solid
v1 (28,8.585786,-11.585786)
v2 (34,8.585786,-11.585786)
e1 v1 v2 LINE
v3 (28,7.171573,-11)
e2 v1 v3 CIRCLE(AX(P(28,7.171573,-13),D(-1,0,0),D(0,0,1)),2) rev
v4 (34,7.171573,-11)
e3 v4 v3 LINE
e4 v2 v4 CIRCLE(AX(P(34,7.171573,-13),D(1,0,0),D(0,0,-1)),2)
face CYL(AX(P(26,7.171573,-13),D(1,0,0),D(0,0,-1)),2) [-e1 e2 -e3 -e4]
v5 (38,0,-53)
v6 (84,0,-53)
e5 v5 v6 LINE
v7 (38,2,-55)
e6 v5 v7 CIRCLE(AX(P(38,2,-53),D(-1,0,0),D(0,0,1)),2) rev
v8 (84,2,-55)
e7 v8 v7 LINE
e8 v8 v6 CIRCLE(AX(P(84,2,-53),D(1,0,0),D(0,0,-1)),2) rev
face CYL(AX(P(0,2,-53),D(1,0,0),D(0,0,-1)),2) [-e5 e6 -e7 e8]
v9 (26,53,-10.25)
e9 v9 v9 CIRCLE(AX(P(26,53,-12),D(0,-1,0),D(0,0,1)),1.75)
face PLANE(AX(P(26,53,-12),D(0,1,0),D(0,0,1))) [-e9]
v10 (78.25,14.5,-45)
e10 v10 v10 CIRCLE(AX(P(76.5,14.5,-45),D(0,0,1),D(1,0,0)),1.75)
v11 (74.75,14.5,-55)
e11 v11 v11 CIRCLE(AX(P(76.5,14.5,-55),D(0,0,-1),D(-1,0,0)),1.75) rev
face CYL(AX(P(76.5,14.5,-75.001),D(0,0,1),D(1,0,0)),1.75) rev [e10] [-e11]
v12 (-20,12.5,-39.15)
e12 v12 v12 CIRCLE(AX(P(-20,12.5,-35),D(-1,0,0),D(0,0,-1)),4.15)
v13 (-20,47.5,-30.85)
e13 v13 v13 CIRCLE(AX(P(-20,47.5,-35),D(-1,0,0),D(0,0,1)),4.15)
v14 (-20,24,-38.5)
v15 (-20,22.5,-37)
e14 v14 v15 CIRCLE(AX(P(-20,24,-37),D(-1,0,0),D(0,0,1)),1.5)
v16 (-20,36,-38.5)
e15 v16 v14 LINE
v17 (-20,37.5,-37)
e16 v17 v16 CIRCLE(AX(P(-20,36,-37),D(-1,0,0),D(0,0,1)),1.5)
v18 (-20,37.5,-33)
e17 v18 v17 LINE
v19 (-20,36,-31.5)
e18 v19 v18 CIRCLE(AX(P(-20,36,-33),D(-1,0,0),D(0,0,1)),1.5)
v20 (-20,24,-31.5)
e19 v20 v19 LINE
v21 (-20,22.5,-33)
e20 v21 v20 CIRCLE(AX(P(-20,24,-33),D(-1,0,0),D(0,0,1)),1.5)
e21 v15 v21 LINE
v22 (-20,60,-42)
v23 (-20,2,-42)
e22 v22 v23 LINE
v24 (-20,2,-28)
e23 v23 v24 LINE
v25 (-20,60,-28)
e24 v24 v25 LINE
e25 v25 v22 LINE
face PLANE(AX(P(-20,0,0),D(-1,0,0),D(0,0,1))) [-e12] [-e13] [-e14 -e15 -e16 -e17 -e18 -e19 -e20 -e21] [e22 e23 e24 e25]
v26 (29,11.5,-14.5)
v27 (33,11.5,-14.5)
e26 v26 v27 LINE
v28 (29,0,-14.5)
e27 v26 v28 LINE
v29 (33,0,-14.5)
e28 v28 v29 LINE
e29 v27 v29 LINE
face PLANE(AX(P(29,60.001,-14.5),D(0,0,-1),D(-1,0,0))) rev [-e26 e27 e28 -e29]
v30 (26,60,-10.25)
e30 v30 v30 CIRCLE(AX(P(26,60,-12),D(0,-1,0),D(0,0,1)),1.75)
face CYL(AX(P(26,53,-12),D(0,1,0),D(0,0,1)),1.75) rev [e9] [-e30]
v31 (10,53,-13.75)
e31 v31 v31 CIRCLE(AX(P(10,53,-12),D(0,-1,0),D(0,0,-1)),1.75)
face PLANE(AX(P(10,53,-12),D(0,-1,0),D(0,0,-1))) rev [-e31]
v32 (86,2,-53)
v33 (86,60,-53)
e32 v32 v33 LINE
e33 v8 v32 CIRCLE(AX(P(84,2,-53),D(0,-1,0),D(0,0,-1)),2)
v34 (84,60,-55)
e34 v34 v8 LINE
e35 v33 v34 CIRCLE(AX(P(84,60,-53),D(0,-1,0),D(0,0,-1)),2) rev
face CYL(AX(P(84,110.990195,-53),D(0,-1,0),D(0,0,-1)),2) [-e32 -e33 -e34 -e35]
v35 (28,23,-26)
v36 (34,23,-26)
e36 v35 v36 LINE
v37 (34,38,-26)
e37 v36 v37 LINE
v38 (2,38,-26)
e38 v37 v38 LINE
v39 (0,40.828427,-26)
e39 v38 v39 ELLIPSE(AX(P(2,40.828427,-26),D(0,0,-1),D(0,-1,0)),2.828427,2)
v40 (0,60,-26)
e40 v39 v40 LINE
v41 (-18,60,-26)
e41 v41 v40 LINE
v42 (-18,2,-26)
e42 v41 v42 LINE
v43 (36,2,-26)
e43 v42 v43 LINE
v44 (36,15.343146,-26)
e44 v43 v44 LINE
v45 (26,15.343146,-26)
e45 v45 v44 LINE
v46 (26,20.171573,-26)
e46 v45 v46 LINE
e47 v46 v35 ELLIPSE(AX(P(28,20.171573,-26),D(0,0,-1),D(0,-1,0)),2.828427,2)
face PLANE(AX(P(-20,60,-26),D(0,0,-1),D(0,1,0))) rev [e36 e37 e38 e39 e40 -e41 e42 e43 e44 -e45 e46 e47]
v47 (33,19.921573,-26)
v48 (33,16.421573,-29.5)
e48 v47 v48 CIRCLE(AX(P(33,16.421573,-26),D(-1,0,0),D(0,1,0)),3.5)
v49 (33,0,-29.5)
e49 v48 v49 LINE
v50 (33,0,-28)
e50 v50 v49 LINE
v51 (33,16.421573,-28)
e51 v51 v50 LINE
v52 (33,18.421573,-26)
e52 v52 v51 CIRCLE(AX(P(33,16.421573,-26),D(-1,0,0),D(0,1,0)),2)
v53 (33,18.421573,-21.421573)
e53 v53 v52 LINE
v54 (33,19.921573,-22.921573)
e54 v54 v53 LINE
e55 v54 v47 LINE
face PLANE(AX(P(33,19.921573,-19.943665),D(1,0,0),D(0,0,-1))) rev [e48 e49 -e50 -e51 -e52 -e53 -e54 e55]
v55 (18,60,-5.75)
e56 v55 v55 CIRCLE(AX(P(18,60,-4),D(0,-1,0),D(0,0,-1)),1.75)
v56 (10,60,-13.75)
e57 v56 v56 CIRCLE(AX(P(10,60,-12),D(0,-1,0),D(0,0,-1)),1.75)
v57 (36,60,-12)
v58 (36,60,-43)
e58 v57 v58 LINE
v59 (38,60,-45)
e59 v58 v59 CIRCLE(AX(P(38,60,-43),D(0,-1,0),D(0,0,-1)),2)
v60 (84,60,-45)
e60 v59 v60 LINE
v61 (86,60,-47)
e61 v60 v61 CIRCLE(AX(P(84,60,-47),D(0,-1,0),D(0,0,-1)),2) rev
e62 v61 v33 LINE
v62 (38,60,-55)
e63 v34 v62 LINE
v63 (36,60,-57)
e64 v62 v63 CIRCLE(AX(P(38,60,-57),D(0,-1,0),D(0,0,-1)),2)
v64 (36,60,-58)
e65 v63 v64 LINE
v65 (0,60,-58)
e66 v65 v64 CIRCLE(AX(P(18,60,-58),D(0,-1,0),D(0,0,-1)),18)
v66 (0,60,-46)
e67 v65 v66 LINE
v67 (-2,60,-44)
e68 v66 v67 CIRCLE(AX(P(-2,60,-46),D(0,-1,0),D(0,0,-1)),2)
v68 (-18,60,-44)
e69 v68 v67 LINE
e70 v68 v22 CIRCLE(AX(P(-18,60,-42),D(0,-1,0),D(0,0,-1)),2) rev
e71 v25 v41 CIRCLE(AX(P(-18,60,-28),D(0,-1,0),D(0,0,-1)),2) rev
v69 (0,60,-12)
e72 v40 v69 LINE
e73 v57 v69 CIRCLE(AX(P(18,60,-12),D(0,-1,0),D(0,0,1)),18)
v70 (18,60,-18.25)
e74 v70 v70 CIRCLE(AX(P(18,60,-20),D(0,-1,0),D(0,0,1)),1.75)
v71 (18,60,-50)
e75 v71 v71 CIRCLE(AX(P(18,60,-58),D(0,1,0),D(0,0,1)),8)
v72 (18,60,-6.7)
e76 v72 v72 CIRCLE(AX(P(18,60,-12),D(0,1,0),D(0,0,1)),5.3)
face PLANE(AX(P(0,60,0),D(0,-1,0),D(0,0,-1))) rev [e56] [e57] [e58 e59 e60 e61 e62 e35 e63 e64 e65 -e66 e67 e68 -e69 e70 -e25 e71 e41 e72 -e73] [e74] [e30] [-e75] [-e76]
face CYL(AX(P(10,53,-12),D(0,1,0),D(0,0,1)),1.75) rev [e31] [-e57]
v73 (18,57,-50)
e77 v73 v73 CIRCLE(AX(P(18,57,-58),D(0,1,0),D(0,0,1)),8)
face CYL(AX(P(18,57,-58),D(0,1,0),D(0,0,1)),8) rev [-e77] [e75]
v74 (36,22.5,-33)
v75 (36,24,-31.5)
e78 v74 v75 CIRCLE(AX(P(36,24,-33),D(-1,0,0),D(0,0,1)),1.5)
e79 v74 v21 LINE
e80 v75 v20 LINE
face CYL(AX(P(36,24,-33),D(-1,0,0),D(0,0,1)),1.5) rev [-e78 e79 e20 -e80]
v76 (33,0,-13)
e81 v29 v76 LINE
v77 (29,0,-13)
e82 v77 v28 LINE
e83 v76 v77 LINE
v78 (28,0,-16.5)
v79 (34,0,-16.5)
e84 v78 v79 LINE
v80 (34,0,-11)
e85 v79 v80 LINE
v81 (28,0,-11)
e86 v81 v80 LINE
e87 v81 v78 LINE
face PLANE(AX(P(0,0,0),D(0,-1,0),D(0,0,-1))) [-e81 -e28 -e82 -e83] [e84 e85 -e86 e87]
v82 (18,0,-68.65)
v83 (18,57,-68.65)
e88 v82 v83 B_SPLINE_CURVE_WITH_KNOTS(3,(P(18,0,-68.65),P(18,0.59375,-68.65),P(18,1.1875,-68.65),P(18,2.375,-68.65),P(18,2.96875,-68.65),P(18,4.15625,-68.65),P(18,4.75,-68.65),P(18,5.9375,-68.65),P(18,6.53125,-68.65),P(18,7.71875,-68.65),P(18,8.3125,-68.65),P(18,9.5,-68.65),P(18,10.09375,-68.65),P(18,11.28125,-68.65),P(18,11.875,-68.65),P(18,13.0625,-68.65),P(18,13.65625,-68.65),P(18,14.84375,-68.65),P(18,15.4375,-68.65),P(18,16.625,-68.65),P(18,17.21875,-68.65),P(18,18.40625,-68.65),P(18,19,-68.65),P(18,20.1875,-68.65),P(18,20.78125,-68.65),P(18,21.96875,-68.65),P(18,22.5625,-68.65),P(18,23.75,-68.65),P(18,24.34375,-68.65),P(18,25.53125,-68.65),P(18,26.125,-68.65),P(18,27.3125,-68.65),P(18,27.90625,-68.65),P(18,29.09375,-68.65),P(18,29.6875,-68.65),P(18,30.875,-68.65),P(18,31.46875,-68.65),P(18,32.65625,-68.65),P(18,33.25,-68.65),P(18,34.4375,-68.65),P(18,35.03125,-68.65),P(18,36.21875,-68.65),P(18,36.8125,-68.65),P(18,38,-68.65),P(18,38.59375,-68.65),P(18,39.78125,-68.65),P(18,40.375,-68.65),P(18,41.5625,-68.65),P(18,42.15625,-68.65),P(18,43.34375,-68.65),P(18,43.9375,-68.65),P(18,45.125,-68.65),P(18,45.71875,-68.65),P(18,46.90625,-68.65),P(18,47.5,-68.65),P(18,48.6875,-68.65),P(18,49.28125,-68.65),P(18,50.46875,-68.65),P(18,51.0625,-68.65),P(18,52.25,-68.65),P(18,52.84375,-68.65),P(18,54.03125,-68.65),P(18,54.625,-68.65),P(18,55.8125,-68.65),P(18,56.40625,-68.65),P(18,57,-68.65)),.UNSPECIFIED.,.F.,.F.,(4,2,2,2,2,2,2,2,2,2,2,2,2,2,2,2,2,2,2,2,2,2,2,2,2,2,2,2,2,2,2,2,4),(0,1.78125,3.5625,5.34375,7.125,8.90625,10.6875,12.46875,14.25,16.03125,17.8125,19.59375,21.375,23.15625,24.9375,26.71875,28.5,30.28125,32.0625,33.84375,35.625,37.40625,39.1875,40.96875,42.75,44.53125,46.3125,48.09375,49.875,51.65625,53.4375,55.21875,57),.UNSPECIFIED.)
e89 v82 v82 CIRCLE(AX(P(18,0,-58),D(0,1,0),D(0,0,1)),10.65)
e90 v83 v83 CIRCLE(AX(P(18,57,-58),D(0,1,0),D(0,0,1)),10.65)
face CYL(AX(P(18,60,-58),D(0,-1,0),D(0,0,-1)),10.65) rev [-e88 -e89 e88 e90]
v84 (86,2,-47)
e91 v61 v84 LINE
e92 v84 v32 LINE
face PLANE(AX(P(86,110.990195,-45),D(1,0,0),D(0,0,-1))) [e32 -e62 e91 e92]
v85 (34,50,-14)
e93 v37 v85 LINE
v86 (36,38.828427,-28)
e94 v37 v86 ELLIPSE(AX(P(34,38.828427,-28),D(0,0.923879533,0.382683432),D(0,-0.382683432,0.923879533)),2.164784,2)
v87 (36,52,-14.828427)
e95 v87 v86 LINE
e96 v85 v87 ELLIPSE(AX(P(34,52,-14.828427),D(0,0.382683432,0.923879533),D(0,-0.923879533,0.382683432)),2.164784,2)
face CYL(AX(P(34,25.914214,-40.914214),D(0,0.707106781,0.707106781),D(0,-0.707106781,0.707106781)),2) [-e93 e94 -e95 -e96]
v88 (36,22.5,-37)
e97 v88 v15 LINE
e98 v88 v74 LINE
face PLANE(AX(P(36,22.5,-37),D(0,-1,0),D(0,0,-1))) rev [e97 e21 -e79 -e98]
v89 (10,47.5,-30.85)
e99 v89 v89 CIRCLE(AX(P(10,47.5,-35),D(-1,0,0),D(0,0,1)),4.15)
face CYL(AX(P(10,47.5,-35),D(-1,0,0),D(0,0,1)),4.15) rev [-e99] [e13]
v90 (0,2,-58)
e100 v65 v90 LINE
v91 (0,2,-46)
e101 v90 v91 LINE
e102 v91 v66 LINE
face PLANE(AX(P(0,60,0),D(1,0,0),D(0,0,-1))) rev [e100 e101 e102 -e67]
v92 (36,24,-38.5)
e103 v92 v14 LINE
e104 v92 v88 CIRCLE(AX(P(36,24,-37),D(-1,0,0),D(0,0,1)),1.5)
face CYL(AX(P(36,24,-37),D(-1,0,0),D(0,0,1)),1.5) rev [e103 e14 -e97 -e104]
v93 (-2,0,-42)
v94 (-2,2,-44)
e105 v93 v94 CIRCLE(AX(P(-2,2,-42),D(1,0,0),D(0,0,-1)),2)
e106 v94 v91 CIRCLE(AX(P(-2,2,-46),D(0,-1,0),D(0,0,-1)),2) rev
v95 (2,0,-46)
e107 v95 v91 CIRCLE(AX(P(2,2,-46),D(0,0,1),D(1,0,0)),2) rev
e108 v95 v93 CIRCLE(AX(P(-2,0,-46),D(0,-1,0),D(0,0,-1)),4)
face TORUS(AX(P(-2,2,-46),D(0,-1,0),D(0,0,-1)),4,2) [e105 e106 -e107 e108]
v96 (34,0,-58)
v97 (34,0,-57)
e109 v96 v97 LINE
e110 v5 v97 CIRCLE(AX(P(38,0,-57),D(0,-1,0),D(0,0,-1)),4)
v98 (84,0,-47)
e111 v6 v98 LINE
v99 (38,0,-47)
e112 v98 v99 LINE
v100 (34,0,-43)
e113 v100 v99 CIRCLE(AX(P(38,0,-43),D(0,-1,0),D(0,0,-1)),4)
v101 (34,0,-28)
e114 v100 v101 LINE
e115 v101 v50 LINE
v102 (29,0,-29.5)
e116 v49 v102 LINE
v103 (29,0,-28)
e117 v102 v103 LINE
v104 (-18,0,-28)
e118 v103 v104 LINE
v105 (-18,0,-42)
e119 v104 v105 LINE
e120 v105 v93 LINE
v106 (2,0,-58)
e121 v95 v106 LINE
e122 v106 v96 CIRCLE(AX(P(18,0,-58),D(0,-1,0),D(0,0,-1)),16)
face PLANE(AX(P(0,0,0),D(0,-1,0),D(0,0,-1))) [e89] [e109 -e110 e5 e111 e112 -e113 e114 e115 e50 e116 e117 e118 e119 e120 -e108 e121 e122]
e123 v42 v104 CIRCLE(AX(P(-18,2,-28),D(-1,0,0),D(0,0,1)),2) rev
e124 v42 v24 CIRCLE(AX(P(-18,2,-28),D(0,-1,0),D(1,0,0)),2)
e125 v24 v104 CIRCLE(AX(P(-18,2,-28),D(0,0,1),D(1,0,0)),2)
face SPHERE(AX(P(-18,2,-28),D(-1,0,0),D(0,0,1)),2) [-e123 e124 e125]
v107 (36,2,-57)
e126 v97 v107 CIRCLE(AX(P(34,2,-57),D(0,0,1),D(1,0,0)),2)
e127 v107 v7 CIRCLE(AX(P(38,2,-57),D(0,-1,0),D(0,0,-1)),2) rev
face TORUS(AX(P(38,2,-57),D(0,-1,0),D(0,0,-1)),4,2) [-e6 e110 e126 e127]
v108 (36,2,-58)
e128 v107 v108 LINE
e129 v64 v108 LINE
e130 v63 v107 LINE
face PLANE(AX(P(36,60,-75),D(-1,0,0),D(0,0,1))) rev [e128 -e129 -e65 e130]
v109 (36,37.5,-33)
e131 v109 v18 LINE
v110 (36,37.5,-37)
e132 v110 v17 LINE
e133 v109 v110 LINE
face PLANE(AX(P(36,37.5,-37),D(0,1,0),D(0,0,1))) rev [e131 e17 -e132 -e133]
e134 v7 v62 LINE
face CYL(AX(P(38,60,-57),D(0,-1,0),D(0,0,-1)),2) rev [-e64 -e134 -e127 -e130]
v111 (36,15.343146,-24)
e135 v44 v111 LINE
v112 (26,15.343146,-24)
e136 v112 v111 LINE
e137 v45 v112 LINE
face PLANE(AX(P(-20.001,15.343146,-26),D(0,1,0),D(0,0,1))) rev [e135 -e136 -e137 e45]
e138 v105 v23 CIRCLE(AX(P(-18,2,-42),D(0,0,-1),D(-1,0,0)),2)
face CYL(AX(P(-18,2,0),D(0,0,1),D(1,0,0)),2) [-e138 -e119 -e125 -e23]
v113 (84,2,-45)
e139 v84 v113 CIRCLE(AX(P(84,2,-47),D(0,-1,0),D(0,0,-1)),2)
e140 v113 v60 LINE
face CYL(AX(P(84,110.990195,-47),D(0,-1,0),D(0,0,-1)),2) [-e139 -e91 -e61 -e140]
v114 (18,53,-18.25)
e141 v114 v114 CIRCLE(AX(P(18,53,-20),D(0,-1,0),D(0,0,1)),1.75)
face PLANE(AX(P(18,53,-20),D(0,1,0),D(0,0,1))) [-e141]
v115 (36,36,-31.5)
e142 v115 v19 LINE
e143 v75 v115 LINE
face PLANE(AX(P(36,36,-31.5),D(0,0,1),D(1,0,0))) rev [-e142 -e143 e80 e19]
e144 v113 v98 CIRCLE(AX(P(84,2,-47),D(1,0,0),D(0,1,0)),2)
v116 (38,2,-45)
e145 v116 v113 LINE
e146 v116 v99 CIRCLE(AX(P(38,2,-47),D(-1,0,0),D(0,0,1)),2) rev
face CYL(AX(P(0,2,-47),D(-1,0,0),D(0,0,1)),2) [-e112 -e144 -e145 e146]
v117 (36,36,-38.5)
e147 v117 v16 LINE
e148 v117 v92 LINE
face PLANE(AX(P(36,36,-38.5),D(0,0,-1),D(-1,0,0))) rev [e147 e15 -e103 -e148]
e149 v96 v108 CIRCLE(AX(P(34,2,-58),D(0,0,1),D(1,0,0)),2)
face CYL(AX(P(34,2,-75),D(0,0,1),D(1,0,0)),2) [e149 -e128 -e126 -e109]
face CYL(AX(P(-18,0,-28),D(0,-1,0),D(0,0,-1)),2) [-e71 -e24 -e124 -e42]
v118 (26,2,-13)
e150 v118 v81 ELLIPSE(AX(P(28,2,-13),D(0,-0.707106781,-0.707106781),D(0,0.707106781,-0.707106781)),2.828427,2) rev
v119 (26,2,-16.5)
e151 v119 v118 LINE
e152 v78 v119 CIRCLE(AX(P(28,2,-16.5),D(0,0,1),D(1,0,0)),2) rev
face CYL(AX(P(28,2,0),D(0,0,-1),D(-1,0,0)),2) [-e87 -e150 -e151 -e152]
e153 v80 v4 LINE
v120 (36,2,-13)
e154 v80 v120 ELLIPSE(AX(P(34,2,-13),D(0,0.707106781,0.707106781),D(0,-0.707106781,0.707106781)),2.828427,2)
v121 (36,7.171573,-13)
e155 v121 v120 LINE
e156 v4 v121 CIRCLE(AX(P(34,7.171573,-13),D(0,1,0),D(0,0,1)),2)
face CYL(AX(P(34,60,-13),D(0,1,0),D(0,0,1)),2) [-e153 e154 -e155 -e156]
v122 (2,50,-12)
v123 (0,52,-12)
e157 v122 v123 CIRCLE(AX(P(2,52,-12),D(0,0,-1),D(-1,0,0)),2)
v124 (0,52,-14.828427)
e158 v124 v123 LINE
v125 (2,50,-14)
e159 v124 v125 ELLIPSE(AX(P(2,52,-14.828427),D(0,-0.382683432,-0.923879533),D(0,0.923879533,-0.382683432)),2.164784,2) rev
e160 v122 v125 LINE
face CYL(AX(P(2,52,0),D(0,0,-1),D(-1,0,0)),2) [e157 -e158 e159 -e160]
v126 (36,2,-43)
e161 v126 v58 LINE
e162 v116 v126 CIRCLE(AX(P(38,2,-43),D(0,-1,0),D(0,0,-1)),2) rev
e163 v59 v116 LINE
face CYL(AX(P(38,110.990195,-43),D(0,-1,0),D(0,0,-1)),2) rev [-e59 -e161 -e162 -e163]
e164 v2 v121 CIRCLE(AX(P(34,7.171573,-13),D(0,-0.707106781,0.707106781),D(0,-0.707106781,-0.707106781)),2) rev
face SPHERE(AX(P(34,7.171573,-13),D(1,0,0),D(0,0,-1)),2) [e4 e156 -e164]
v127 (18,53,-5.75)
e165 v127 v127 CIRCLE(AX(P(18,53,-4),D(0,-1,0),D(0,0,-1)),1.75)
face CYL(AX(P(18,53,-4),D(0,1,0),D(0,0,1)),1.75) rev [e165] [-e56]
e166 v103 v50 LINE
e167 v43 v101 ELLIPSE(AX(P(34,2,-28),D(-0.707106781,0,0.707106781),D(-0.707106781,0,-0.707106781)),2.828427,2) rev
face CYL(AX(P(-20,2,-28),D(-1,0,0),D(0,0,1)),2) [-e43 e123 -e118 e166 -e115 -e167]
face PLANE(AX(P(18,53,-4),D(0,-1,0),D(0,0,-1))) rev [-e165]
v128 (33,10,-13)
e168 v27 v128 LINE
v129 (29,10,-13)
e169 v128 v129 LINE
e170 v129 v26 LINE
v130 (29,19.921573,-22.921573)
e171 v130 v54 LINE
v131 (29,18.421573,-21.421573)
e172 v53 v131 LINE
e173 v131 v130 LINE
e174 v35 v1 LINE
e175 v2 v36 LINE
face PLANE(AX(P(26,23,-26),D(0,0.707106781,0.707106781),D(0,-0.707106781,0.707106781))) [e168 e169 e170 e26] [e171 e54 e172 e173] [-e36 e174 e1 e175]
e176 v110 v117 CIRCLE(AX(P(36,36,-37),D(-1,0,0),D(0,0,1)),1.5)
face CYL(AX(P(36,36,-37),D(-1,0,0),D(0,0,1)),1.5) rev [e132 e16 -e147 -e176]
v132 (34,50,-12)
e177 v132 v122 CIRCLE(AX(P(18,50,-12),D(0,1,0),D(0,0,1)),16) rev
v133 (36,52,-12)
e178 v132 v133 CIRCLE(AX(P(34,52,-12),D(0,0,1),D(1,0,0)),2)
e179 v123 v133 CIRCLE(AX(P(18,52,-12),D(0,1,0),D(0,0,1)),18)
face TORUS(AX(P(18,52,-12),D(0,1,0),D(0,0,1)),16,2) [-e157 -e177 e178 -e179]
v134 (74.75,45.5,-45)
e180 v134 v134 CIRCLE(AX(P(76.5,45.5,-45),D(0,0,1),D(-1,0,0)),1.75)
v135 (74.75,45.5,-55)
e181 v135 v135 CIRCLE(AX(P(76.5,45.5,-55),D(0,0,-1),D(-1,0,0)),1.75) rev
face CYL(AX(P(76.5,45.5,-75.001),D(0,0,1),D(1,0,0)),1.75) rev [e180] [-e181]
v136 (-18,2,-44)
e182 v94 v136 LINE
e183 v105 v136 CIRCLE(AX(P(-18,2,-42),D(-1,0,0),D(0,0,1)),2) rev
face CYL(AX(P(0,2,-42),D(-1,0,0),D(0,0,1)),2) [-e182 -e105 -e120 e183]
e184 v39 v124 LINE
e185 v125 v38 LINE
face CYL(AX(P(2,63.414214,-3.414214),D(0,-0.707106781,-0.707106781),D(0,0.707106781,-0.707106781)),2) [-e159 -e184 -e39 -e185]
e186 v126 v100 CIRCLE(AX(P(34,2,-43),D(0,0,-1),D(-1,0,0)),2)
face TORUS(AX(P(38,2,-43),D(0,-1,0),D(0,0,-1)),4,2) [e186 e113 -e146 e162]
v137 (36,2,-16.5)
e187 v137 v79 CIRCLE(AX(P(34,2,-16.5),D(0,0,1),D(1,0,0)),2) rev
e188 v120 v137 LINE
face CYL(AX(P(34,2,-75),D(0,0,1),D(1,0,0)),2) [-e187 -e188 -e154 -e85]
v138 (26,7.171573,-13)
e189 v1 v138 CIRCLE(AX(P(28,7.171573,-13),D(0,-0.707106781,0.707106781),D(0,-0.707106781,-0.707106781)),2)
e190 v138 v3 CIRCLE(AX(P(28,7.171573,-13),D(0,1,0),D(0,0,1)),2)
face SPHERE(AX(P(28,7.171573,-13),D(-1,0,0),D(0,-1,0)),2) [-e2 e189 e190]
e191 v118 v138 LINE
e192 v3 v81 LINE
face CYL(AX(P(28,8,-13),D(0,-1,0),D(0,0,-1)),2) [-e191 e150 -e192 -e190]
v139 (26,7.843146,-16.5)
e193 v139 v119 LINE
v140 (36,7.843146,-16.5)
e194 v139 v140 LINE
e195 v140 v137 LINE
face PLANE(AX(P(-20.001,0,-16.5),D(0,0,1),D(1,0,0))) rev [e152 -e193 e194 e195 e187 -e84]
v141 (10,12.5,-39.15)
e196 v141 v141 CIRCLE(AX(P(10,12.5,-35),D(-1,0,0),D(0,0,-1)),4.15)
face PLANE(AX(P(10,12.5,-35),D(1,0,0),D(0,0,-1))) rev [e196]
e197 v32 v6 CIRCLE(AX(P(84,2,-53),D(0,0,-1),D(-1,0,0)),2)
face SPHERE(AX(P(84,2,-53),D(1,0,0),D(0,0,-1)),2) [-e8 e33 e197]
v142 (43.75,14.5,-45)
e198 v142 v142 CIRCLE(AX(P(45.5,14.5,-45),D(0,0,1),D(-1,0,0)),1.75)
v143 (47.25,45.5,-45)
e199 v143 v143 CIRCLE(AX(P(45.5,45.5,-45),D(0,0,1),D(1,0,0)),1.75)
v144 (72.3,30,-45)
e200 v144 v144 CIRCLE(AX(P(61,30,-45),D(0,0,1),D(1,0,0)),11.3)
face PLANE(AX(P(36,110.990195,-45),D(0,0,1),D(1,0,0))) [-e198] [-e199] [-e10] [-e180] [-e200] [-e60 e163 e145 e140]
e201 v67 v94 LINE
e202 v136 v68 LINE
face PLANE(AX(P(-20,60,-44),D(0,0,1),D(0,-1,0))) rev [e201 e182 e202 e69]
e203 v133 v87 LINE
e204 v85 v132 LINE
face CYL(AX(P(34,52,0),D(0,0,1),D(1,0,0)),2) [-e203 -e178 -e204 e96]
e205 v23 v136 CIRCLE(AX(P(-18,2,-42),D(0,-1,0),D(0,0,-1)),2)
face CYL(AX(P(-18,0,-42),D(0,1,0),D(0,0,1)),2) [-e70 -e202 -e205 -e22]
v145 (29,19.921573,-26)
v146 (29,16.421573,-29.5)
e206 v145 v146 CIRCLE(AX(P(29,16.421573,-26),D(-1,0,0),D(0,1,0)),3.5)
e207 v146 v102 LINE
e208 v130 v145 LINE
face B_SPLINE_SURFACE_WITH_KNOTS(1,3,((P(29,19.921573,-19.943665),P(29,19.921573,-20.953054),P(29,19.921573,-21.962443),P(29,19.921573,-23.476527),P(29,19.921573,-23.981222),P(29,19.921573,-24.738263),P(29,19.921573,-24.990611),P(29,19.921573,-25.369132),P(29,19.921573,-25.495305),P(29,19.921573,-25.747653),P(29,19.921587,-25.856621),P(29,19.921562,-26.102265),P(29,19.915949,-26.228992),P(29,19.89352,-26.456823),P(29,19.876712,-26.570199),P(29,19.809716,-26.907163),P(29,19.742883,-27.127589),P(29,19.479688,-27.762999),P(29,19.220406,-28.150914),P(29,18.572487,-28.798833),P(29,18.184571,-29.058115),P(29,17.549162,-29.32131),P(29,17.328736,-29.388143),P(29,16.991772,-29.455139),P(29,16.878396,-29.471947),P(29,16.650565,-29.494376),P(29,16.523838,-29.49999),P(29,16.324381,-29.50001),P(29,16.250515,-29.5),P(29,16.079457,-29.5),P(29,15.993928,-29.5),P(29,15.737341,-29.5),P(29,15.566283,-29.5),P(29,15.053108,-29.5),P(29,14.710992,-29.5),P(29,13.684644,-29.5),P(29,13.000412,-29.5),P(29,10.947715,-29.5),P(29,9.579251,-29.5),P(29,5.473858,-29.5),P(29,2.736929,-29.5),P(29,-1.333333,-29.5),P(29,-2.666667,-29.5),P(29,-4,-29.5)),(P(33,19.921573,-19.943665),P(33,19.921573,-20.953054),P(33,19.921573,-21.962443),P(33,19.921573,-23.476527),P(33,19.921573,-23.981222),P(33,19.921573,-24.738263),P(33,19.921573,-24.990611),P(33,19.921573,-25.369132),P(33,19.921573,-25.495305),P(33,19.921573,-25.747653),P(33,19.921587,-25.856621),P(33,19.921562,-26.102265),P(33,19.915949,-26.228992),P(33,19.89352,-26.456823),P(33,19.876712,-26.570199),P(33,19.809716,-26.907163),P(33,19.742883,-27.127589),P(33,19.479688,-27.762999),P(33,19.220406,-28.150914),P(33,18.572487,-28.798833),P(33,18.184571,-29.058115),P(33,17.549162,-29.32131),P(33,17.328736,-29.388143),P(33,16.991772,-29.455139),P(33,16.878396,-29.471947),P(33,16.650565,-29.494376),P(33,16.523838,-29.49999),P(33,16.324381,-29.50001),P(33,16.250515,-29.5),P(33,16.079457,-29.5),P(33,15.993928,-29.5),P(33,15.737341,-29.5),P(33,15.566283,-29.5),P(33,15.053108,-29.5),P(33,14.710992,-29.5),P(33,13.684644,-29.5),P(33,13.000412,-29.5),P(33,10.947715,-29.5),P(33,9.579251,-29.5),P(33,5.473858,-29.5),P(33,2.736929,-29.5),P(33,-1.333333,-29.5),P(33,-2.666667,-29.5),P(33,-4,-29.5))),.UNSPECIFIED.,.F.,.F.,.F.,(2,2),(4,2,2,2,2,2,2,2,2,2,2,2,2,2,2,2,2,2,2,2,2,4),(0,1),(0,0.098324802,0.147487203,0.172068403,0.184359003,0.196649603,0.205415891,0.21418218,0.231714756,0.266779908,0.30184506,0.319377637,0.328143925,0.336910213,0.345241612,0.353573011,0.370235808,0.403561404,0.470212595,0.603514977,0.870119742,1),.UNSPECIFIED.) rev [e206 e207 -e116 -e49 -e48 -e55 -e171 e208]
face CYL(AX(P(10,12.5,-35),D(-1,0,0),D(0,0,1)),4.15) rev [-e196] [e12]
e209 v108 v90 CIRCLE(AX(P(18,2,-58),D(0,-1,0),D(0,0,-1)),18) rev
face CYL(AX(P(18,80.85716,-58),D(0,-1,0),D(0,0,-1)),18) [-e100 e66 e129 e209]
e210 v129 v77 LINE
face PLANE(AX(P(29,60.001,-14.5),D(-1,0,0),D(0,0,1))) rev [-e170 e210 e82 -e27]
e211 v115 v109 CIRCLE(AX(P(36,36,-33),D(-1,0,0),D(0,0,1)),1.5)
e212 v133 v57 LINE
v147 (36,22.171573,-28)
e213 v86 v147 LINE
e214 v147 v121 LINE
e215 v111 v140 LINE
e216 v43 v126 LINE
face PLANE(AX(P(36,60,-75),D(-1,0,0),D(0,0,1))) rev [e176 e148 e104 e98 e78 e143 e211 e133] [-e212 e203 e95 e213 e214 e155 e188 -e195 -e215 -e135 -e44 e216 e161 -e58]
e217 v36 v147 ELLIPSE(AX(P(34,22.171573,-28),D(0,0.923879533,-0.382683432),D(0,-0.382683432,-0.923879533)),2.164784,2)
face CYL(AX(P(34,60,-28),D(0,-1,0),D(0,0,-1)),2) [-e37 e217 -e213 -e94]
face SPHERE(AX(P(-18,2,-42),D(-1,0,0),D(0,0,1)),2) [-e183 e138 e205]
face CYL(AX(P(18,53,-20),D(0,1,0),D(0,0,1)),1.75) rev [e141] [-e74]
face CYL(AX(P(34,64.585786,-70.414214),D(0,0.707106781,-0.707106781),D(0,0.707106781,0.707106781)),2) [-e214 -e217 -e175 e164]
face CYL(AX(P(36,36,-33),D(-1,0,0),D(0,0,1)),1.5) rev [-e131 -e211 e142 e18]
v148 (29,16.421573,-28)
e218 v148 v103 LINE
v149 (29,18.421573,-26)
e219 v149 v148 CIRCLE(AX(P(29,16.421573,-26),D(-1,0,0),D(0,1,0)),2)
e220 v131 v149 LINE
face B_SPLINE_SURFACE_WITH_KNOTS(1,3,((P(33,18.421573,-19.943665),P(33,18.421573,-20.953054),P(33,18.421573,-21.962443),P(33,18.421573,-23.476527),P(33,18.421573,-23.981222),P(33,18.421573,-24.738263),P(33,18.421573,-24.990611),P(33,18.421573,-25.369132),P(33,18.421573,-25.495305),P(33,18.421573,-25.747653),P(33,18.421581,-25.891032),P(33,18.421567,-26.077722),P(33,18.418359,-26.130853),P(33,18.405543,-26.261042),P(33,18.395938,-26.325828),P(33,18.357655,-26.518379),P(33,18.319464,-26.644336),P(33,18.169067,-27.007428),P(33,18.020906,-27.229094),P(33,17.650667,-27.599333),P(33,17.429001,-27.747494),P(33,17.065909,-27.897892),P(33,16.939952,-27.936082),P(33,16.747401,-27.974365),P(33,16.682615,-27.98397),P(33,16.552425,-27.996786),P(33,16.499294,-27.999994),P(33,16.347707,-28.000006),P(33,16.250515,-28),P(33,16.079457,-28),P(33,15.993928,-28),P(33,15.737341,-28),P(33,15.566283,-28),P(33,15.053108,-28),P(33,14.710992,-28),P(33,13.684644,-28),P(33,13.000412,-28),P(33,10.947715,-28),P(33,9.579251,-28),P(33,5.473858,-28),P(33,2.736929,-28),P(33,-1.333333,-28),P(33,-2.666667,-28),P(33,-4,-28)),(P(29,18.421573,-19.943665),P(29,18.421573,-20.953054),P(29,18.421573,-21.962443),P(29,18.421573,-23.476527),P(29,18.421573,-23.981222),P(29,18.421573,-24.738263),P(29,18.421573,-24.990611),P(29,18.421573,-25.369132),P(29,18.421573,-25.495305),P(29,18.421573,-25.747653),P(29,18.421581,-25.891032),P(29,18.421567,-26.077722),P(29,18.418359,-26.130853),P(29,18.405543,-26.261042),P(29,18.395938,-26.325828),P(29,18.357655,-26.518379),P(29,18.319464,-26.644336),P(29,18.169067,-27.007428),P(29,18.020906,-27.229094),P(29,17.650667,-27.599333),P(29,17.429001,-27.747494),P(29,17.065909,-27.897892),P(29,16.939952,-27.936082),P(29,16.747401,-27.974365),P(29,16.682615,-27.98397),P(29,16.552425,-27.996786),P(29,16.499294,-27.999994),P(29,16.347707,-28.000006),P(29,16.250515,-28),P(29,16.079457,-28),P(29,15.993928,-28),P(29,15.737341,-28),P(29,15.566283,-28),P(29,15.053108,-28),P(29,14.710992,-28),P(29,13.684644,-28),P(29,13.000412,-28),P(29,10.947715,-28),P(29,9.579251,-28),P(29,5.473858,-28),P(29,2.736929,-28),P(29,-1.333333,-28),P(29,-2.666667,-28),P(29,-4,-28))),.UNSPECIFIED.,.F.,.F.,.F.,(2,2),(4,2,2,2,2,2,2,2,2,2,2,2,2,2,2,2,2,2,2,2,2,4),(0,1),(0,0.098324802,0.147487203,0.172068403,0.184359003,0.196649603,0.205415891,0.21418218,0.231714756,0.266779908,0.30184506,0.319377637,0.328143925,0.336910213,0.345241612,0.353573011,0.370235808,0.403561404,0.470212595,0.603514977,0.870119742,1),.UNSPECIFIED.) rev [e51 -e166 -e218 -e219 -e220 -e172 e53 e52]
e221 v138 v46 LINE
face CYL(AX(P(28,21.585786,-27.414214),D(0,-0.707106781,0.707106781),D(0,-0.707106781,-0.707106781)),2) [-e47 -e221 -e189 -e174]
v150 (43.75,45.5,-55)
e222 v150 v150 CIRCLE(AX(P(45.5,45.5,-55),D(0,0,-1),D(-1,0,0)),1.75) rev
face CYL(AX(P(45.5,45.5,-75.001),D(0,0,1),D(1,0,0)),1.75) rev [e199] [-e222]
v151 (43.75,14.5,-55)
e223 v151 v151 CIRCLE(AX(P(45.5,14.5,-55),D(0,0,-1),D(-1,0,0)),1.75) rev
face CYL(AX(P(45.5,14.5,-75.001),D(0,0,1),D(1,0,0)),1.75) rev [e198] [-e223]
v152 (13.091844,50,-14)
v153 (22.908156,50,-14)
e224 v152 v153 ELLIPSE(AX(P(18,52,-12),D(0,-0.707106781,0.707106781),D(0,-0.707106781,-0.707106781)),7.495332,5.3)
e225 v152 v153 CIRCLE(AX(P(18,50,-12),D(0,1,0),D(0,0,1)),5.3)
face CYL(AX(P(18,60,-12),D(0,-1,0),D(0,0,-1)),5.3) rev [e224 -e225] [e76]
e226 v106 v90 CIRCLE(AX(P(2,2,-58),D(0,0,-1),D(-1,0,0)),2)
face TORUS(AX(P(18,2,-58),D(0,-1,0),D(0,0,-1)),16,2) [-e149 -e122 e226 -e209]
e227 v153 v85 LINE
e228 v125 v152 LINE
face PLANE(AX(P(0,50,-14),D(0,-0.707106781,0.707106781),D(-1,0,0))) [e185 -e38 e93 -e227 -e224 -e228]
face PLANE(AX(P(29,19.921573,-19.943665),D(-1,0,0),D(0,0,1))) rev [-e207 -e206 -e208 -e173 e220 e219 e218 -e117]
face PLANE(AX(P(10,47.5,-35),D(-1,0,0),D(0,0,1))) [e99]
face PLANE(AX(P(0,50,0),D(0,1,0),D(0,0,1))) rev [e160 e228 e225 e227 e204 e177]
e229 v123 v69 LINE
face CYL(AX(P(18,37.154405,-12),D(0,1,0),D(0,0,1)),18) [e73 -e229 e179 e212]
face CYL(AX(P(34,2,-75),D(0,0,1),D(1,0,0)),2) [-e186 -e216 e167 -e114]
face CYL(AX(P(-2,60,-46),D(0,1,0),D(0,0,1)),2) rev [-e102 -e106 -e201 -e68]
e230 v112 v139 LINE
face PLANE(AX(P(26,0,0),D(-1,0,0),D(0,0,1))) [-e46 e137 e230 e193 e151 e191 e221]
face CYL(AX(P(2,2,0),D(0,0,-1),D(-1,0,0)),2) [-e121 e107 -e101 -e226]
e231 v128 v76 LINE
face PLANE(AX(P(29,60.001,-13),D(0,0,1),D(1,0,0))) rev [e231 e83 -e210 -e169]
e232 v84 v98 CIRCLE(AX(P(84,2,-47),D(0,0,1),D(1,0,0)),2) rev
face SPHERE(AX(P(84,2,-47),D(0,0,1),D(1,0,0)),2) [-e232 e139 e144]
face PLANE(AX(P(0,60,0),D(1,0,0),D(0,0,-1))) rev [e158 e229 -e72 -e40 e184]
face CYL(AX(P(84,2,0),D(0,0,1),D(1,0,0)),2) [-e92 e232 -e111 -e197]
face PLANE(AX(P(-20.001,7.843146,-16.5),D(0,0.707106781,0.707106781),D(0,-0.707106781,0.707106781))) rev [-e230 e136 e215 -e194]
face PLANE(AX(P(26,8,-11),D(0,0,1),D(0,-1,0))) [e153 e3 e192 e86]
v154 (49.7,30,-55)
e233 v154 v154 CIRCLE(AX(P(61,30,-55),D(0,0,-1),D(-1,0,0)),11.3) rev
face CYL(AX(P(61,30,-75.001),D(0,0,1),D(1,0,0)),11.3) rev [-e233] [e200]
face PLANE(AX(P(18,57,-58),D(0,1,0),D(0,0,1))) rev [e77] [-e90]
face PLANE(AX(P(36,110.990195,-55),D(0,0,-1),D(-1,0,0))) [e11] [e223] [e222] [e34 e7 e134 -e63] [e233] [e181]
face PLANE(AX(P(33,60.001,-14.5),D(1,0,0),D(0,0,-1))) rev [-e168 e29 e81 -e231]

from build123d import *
from build123d.topology import SkipClean

# Parameters (mm, degrees)
SKETCH1_W           = 36
SKETCH1_H           = 75
SKETCH1_R           = 10.65
SKETCH1_R_2         = 5.3
BOSS_EXTRUDE1_DEPTH = 60
SKETCH2_R           = 1.75
CUT_EXTRUDE1_DEPTH  = 7
SKETCH4_W           = 18
SKETCH4_H           = 60
BOSS_EXTRUDE2_DEPTH = 20
SKETCH5_R           = 4.15
CUT_EXTRUDE2_DEPTH  = 30
CUT_EXTRUDE3_DEPTH  = 112.180034179
SKETCH7_W           = 50
SKETCH7_H           = 10
BOSS_EXTRUDE3_DEPTH = 60
CUT_EXTRUDE4_REACH  = 116.11
SKETCH8_R           = 11.3
SKETCH8_R_2         = 1.75
SKETCH9_W           = 36
SKETCH9_H           = 26
CUT_EXTRUDE5_DEPTH  = 50
CUT_EXTRUDE6_DEPTH  = 60
BOSS_EXTRUDE6_DEPTH = 60
BOSS_EXTRUDE7_START = -3
SKETCH21_R          = 10.65
SKETCH21_R_2        = 8
BOSS_EXTRUDE7_DEPTH = 3
CUT_EXTRUDE7_DEPTH  = 10
BOSS_EXTRUDE5_DEPTH = 10
BOSS_EXTRUDE8_DEPTH = 10
CUT_EXTRUDE8_REACH  = 131.507
SKETCH24_W          = 4
SKETCH24_H          = 1.5
CUT_EXTRUDE9_REACH  = 113.857
CUT_SWEEP1_START    = 29
CUT_SWEEP1_DEPTH    = 4
CHAMFER2_SIZE       = 12
FILLET1_R           = 2


with BuildPart() as part:
    # Sketch1 → Boss-Extrude1 (new body)
    with BuildSketch(Plane(origin=(0, 0, 0), x_dir=(1, 0, 0), z_dir=(0, 1, 0))):
        with Locations((18, 37.5)):
            Rectangle(SKETCH1_W, SKETCH1_H)
        with Locations(Location((18, 58, 0), (0, 0, 90))):
            Circle(SKETCH1_R, mode=Mode.SUBTRACT)
        with Locations(Location((18, 12, 0), (0, 0, 90))):
            Circle(SKETCH1_R_2, mode=Mode.SUBTRACT)
    extrude(amount=BOSS_EXTRUDE1_DEPTH)

    # Sketch2 → Cut-Extrude1 (cut)
    with BuildSketch(Plane.XZ.offset(-60)):
        with Locations(Location((10, -12, 0), (0, 0, 270))):
            Circle(SKETCH2_R)
        with Locations(Location((26, -12, 0), (0, 0, 90))):
            Circle(SKETCH2_R)
        with Locations(Location((18, -4, 0), (0, 0, 270))):
            Circle(SKETCH2_R)
        with Locations(Location((18, -20, 0), (0, 0, 90))):
            Circle(SKETCH2_R)
    extrude(amount=CUT_EXTRUDE1_DEPTH, mode=Mode.SUBTRACT)

    # Sketch4 → Boss-Extrude2 (add)
    with BuildSketch(Plane.ZY):
        with Locations((-35, 30)):
            Rectangle(SKETCH4_W, SKETCH4_H)
    extrude(amount=BOSS_EXTRUDE2_DEPTH)

    # Sketch5 → Cut-Extrude2 (cut)
    with BuildSketch(Plane.ZY.offset(20)):
        with Locations((-35, 47.5)):
            Circle(SKETCH5_R)
        with Locations(Location((-35, 12.5, 0), (0, 0, 180))):
            Circle(SKETCH5_R)
    extrude(amount=-CUT_EXTRUDE2_DEPTH, mode=Mode.SUBTRACT)

    # Sketch6 → Cut-Extrude3 (cut, through all)
    with BuildSketch(Plane.ZY.offset(20)):
        with BuildLine():
            Line((-37, 37.5), (-33, 37.5))
            ThreePointArc((-33, 37.5), (-31.939339828, 37.060660172), (-31.5, 36))
            Line((-31.5, 36), (-31.5, 24))
            ThreePointArc((-31.5, 24), (-31.939339828, 22.939339828), (-33, 22.5))
            Line((-33, 22.5), (-37, 22.5))
            ThreePointArc((-37, 22.5), (-38.060660172, 22.939339828), (-38.5, 24))
            Line((-38.5, 24), (-38.5, 36))
            ThreePointArc((-38.5, 36), (-38.060660172, 37.060660172), (-37, 37.5))
        make_face()
    extrude(amount=-CUT_EXTRUDE3_DEPTH, mode=Mode.SUBTRACT)

    # Sketch7 → Boss-Extrude3 (add)
    with BuildSketch(Plane.XZ):
        with Locations((61, -50)):
            Rectangle(SKETCH7_W, SKETCH7_H)
    extrude(amount=-BOSS_EXTRUDE3_DEPTH)

    # Sketch8 → Cut-Extrude4 (cut, up to next)
    with BuildSketch(Plane.XY.offset(-45), mode=Mode.PRIVATE) as cut_extrude4_sk1:
        with Locations((61, 30)):
            Circle(SKETCH8_R)
    cut_extrude4_tool1 = extrude(cut_extrude4_sk1.sketch, amount=-CUT_EXTRUDE4_REACH, mode=Mode.PRIVATE) & part.part
    # Sketch8 → Cut-Extrude4 (cut, up to next)
    with BuildSketch(Plane.XY.offset(-45), mode=Mode.PRIVATE) as cut_extrude4_sk2:
        with Locations((45.5, 45.5)):
            Circle(SKETCH8_R_2)
    cut_extrude4_tool2 = extrude(cut_extrude4_sk2.sketch, amount=-CUT_EXTRUDE4_REACH, mode=Mode.PRIVATE) & part.part
    # Sketch8 → Cut-Extrude4 (cut, up to next)
    with BuildSketch(Plane.XY.offset(-45), mode=Mode.PRIVATE) as cut_extrude4_sk3:
        with Locations(Location((76.5, 45.5, 0), (0, 0, 180))):
            Circle(SKETCH8_R_2)
    cut_extrude4_tool3 = extrude(cut_extrude4_sk3.sketch, amount=-CUT_EXTRUDE4_REACH, mode=Mode.PRIVATE) & part.part
    # Sketch8 → Cut-Extrude4 (cut, up to next)
    with BuildSketch(Plane.XY.offset(-45), mode=Mode.PRIVATE) as cut_extrude4_sk4:
        with Locations((76.5, 14.5)):
            Circle(SKETCH8_R_2)
    cut_extrude4_tool4 = extrude(cut_extrude4_sk4.sketch, amount=-CUT_EXTRUDE4_REACH, mode=Mode.PRIVATE) & part.part
    # Sketch8 → Cut-Extrude4 (cut, up to next)
    with BuildSketch(Plane.XY.offset(-45), mode=Mode.PRIVATE) as cut_extrude4_sk5:
        with Locations(Location((45.5, 14.5, 0), (0, 0, 180))):
            Circle(SKETCH8_R_2)
    cut_extrude4_tool5 = extrude(cut_extrude4_sk5.sketch, amount=-CUT_EXTRUDE4_REACH, mode=Mode.PRIVATE) & part.part
    add(cut_extrude4_tool1.solids().sort_by_distance((61, 30, -45))[0], mode=Mode.SUBTRACT)
    add(cut_extrude4_tool2.solids().sort_by_distance((45.5, 45.5, -45))[0], mode=Mode.SUBTRACT)
    add(cut_extrude4_tool3.solids().sort_by_distance((76.5, 45.5, -45))[0], mode=Mode.SUBTRACT)
    add(cut_extrude4_tool4.solids().sort_by_distance((76.5, 14.5, -45))[0], mode=Mode.SUBTRACT)
    add(cut_extrude4_tool5.solids().sort_by_distance((45.5, 14.5, -45))[0], mode=Mode.SUBTRACT)

    # Sketch9 → Cut-Extrude5 (cut)
    with BuildSketch(Plane.XZ):
        with Locations((18, -13)):
            Rectangle(SKETCH9_W, SKETCH9_H)
    extrude(amount=-CUT_EXTRUDE5_DEPTH, mode=Mode.SUBTRACT)

    # Sketch10 → Cut-Extrude6 (cut)
    with BuildSketch(Plane.XZ):
        with BuildLine():
            Line((12.083920217, -75), (0, -75))
            Line((0, -75), (0, -58))
            ThreePointArc((0, -58), (3.328779258, -68.428580054), (12.083920217, -75))
        make_face()
        with BuildLine():
            Line((23.916079783, -75), (36, -75))
            Line((36, -75), (36, -58))
            ThreePointArc((36, -58), (32.671220742, -68.428580054), (23.916079783, -75))
        make_face()
    extrude(amount=-CUT_EXTRUDE6_DEPTH, mode=Mode.SUBTRACT)

    # Sketch19 → Boss-Extrude6 (add)
    with BuildSketch(Plane.XZ):
        with BuildLine():
            Line((12.083920217, -75), (23.916079783, -75))
            ThreePointArc((23.916079783, -75), (18, -76), (12.083920217, -75))
        make_face()
    extrude(amount=-BOSS_EXTRUDE6_DEPTH)

    # Sketch21 → Boss-Extrude7 (add)
    with BuildSketch(Plane(origin=(0, 60, 0), x_dir=(1, 0, 0), z_dir=(0, 1, 0)).offset(BOSS_EXTRUDE7_START)):
        with Locations(Location((18, 58, 0), (0, 0, 90))):
            Circle(SKETCH21_R)
        with Locations(Location((18, 58, 0), (0, 0, 270))):
            Circle(SKETCH21_R_2, mode=Mode.SUBTRACT)
    extrude(amount=BOSS_EXTRUDE7_DEPTH)

    # Sketch11 → Cut-Extrude7 (cut)
    with BuildSketch(Plane(origin=(0, 60, 0), x_dir=(1, 0, 0), z_dir=(0, 1, 0))):
        with BuildLine():
            Line((0, 12), (0, 0))
            Line((0, 0), (4.583592135, 0))
            ThreePointArc((4.583592135, 0), (1.184897539, 5.577202384), (0, 12))
        make_face()
        with BuildLine():
            Line((36, 12), (36, 0))
            Line((36, 0), (31.416407865, 0))
            ThreePointArc((31.416407865, 0), (34.815102461, 5.577202384), (36, 12))
        make_face()
    extrude(amount=-CUT_EXTRUDE7_DEPTH, mode=Mode.SUBTRACT)

    # Sketch13 → Boss-Extrude5 (add)
    with SkipClean():  # the faces are left unmerged after this step: merging them gives an invalid solid
        with BuildSketch(Plane(origin=(0, 60, 0), x_dir=(1, 0, 0), z_dir=(0, 1, 0))):
            with BuildLine():
                Line((4.583592135, 0), (31.416407865, 0))
                ThreePointArc((31.416407865, 0), (18, -6), (4.583592135, 0))
            make_face()
        extrude(amount=-BOSS_EXTRUDE5_DEPTH)

    # Sketch23 → Boss-Extrude8 (add)
    with BuildSketch(Plane(origin=(36, 0, 0), x_dir=(0, 0, -1), z_dir=(1, 0, 0))):
        Polygon((26, 23), (11, 8), (11, 0), (26, 0), align=None)
    extrude(amount=-BOSS_EXTRUDE8_DEPTH)

    # Cut-Extrude8: up to this plane
    cut_extrude8_end = Plane(origin=(26, 23, -26), z_dir=(0, 0.7071067811865437, 0.7071067811865515))
    # Sketch24 → Cut-Extrude8 (cut, up to the surface)
    with BuildSketch(Plane.XZ, mode=Mode.PRIVATE) as cut_extrude8_sk1:
        with Locations((31, -13.75)):
            Rectangle(SKETCH24_W, SKETCH24_H)
    cut_extrude8_tool1 = split(extrude(cut_extrude8_sk1.sketch, amount=-CUT_EXTRUDE8_REACH, mode=Mode.PRIVATE), bisect_by=cut_extrude8_end, keep=Keep.BOTH, mode=Mode.PRIVATE)
    add(cut_extrude8_tool1.solids().sort_by_distance((31, 0, -13.75))[0], mode=Mode.SUBTRACT)

    # Sketch25 → Cut-Extrude9 (cut, up to next)
    with BuildSketch(Plane(origin=(36, 0, 0), x_dir=(0, 0, -1), z_dir=(1, 0, 0)), mode=Mode.PRIVATE) as cut_extrude9_sk1:
        Polygon((16.5, 0), (26, 0), (26, 15.343145751), (24, 15.343145751), (16.5, 7.843145751), align=None)
    cut_extrude9_tool1 = extrude(cut_extrude9_sk1.sketch, amount=-CUT_EXTRUDE9_REACH, mode=Mode.PRIVATE) & part.part
    add(cut_extrude9_tool1.solids().sort_by_distance((36, 6.435116, -21.787946))[0], mode=Mode.SUBTRACT)

    # Cut-Sweep1: read off the stored shape, not the designer's step
    # Cut-Sweep1 outline → Cut-Sweep1 (cut)
    with BuildSketch(Plane.YZ.offset(CUT_SWEEP1_START)):
        with BuildLine():
            Line((19.921572875, -22.921572875), (18.421572875, -21.421572875))
            add(Edge.make_bspline(
                [(18.421572875, -21.421572875), (18.421572875, -21.938326003), (18.421572875, -22.455079131), (18.421572875, -23.476526882), (18.421572875, -23.981221506), (18.421572875, -24.738263441), (18.421572875, -24.990610753), (18.421572875, -25.369131721), (18.421572875, -25.495305376), (18.421572875, -25.747652688), (18.421581217, -25.891031974), (18.421566925, -26.077721599), (18.418359294, -26.130852526), (18.405542514, -26.26104187), (18.39593825, -26.325827803), (18.357654737, -26.518378806), (18.319464396, -26.64433641), (18.169067029, -27.007427774), (18.020906029, -27.229093971), (17.650666846, -27.599333154), (17.429000649, -27.747494154), (17.065909286, -27.897891521), (16.939951681, -27.936081862), (16.747400678, -27.974365375), (16.682614745, -27.983969638), (16.552425401, -27.996786418), (16.499294475, -27.99999405), (16.347706988, -28.000005655), (16.250514824, -28), (16.079456774, -28), (15.993927748, -28), (15.737340672, -28), (15.566282621, -28), (15.053108469, -28), (14.710992367, -28), (13.684644063, -28), (13.00041186, -28), (10.94771525, -28), (9.579250844, -28), (5.473857625, -28), (2.736928813, -28), (0, -28)],
                knots=[0.04798778, 0.04798778, 0.04798778, 0.04798778, 0.098324802, 0.098324802, 0.147487203, 0.147487203, 0.172068403, 0.172068403, 0.184359003, 0.184359003, 0.196649603, 0.196649603, 0.205415891, 0.205415891, 0.21418218, 0.21418218, 0.231714756, 0.231714756, 0.266779908, 0.266779908, 0.30184506, 0.30184506, 0.319377637, 0.319377637, 0.328143925, 0.328143925, 0.336910213, 0.336910213, 0.345241612, 0.345241612, 0.353573011, 0.353573011, 0.370235808, 0.370235808, 0.403561404, 0.403561404, 0.470212595, 0.470212595, 0.603514977, 0.603514977, 0.870119742, 0.870119742, 0.870119742, 0.870119742], degree=3))
            Line((0, -28), (0, -29.5))
            add(Edge.make_bspline(
                [(19.921572875, -22.921572875), (19.921572875, -22.938326003), (19.921572875, -22.955079131), (19.921572875, -23.476526882), (19.921572875, -23.981221506), (19.921572875, -24.738263441), (19.921572875, -24.990610753), (19.921572875, -25.369131721), (19.921572875, -25.495305376), (19.921572875, -25.747652688), (19.921587474, -25.856621076), (19.921562463, -26.102265222), (19.915949107, -26.22899192), (19.893519742, -26.456823273), (19.876712281, -26.570198655), (19.809716134, -26.90716291), (19.742883037, -27.127588718), (19.479687644, -27.762998604), (19.220405895, -28.150914449), (18.572487324, -28.798833019), (18.184571479, -29.058114769), (17.549161593, -29.321310161), (17.328735785, -29.388143258), (16.99177153, -29.455139406), (16.878396148, -29.471946867), (16.650564796, -29.494376232), (16.523838097, -29.499989588), (16.324380957, -29.500009896), (16.250514824, -29.5), (16.079456774, -29.5), (15.993927748, -29.5), (15.737340672, -29.5), (15.566282621, -29.5), (15.053108469, -29.5), (14.710992367, -29.5), (13.684644063, -29.5), (13.00041186, -29.5), (10.94771525, -29.5), (9.579250844, -29.5), (5.473857625, -29.5), (2.736928813, -29.5), (0, -29.5)],
                knots=[0.096692876, 0.096692876, 0.096692876, 0.096692876, 0.098324802, 0.098324802, 0.147487203, 0.147487203, 0.172068403, 0.172068403, 0.184359003, 0.184359003, 0.196649603, 0.196649603, 0.205415891, 0.205415891, 0.21418218, 0.21418218, 0.231714756, 0.231714756, 0.266779908, 0.266779908, 0.30184506, 0.30184506, 0.319377637, 0.319377637, 0.328143925, 0.328143925, 0.336910213, 0.336910213, 0.345241612, 0.345241612, 0.353573011, 0.353573011, 0.370235808, 0.370235808, 0.403561404, 0.403561404, 0.470212595, 0.470212595, 0.603514977, 0.603514977, 0.870119742, 0.870119742, 0.870119742, 0.870119742], degree=3))
        make_face()
    extrude(amount=CUT_SWEEP1_DEPTH, mode=Mode.SUBTRACT)

    # Chamfer2
    # the kernel refuses this chamfer: 12 mm, written as the material it adds along each edge
    with BuildSketch(Plane(origin=(0, 50, -26), x_dir=(0, -1, 0), z_dir=(1, 0, 0))) as chamfer2_piece_1_section:
        Polygon((CHAMFER2_SIZE, 0), (0, -CHAMFER2_SIZE), (0, 0), align=None)
    chamfer2_piece_1 = extrude(amount=36, mode=Mode.PRIVATE)
    chamfer2_piece_1 = chamfer2_piece_1 - Plane(origin=(18, 50, -12), x_dir=(0, 0, -1), z_dir=(0, -1, 0)) * Cylinder(5.3, 120, mode=Mode.PRIVATE)
    add(chamfer2_piece_1)

    # Fillet1
    fillet1_edges = [part.edges().sort_by_distance(p)[0] for p in [
        (0, 44, -20),
        (36, 44, -20),
        (34.815102461, 50, -5.577202384),
        (36, 50, -13),
        (0, 50, -13),
        (1.184897539, 50, -5.577202384),
        (18, 50, 6),
        (36, 30.5, -26),
        (8, 0, -26),
        (-20, 30, -26),
        (36, 0, -35.5),
        (36, 0, -13.75),
        (36, 4, -11),
        (36, 15.5, -18.5),
        (36, 30, -45),
        (26, 15.5, -18.5),
        (31, 8, -11),
        (26, 0, -13.75),
        (26, 4, -11),
        (61, 0, -45),
        (86, 0, -50),
        (61, 0, -55),
        (-20, 0, -35),
        (-10, 0, -44),
        (18, 0, -76),
        (0, 0, -51),
        (-20, 30, -44),
        (86, 30, -45),
        (86, 30, -55),
        (36, 30, -55),
        (0, 30, -44),
    ]]
    fillet(fillet1_edges, radius=FILLET1_R - 0.0001)  # a hair under: the kernel refuses the full size


solid = part.part
